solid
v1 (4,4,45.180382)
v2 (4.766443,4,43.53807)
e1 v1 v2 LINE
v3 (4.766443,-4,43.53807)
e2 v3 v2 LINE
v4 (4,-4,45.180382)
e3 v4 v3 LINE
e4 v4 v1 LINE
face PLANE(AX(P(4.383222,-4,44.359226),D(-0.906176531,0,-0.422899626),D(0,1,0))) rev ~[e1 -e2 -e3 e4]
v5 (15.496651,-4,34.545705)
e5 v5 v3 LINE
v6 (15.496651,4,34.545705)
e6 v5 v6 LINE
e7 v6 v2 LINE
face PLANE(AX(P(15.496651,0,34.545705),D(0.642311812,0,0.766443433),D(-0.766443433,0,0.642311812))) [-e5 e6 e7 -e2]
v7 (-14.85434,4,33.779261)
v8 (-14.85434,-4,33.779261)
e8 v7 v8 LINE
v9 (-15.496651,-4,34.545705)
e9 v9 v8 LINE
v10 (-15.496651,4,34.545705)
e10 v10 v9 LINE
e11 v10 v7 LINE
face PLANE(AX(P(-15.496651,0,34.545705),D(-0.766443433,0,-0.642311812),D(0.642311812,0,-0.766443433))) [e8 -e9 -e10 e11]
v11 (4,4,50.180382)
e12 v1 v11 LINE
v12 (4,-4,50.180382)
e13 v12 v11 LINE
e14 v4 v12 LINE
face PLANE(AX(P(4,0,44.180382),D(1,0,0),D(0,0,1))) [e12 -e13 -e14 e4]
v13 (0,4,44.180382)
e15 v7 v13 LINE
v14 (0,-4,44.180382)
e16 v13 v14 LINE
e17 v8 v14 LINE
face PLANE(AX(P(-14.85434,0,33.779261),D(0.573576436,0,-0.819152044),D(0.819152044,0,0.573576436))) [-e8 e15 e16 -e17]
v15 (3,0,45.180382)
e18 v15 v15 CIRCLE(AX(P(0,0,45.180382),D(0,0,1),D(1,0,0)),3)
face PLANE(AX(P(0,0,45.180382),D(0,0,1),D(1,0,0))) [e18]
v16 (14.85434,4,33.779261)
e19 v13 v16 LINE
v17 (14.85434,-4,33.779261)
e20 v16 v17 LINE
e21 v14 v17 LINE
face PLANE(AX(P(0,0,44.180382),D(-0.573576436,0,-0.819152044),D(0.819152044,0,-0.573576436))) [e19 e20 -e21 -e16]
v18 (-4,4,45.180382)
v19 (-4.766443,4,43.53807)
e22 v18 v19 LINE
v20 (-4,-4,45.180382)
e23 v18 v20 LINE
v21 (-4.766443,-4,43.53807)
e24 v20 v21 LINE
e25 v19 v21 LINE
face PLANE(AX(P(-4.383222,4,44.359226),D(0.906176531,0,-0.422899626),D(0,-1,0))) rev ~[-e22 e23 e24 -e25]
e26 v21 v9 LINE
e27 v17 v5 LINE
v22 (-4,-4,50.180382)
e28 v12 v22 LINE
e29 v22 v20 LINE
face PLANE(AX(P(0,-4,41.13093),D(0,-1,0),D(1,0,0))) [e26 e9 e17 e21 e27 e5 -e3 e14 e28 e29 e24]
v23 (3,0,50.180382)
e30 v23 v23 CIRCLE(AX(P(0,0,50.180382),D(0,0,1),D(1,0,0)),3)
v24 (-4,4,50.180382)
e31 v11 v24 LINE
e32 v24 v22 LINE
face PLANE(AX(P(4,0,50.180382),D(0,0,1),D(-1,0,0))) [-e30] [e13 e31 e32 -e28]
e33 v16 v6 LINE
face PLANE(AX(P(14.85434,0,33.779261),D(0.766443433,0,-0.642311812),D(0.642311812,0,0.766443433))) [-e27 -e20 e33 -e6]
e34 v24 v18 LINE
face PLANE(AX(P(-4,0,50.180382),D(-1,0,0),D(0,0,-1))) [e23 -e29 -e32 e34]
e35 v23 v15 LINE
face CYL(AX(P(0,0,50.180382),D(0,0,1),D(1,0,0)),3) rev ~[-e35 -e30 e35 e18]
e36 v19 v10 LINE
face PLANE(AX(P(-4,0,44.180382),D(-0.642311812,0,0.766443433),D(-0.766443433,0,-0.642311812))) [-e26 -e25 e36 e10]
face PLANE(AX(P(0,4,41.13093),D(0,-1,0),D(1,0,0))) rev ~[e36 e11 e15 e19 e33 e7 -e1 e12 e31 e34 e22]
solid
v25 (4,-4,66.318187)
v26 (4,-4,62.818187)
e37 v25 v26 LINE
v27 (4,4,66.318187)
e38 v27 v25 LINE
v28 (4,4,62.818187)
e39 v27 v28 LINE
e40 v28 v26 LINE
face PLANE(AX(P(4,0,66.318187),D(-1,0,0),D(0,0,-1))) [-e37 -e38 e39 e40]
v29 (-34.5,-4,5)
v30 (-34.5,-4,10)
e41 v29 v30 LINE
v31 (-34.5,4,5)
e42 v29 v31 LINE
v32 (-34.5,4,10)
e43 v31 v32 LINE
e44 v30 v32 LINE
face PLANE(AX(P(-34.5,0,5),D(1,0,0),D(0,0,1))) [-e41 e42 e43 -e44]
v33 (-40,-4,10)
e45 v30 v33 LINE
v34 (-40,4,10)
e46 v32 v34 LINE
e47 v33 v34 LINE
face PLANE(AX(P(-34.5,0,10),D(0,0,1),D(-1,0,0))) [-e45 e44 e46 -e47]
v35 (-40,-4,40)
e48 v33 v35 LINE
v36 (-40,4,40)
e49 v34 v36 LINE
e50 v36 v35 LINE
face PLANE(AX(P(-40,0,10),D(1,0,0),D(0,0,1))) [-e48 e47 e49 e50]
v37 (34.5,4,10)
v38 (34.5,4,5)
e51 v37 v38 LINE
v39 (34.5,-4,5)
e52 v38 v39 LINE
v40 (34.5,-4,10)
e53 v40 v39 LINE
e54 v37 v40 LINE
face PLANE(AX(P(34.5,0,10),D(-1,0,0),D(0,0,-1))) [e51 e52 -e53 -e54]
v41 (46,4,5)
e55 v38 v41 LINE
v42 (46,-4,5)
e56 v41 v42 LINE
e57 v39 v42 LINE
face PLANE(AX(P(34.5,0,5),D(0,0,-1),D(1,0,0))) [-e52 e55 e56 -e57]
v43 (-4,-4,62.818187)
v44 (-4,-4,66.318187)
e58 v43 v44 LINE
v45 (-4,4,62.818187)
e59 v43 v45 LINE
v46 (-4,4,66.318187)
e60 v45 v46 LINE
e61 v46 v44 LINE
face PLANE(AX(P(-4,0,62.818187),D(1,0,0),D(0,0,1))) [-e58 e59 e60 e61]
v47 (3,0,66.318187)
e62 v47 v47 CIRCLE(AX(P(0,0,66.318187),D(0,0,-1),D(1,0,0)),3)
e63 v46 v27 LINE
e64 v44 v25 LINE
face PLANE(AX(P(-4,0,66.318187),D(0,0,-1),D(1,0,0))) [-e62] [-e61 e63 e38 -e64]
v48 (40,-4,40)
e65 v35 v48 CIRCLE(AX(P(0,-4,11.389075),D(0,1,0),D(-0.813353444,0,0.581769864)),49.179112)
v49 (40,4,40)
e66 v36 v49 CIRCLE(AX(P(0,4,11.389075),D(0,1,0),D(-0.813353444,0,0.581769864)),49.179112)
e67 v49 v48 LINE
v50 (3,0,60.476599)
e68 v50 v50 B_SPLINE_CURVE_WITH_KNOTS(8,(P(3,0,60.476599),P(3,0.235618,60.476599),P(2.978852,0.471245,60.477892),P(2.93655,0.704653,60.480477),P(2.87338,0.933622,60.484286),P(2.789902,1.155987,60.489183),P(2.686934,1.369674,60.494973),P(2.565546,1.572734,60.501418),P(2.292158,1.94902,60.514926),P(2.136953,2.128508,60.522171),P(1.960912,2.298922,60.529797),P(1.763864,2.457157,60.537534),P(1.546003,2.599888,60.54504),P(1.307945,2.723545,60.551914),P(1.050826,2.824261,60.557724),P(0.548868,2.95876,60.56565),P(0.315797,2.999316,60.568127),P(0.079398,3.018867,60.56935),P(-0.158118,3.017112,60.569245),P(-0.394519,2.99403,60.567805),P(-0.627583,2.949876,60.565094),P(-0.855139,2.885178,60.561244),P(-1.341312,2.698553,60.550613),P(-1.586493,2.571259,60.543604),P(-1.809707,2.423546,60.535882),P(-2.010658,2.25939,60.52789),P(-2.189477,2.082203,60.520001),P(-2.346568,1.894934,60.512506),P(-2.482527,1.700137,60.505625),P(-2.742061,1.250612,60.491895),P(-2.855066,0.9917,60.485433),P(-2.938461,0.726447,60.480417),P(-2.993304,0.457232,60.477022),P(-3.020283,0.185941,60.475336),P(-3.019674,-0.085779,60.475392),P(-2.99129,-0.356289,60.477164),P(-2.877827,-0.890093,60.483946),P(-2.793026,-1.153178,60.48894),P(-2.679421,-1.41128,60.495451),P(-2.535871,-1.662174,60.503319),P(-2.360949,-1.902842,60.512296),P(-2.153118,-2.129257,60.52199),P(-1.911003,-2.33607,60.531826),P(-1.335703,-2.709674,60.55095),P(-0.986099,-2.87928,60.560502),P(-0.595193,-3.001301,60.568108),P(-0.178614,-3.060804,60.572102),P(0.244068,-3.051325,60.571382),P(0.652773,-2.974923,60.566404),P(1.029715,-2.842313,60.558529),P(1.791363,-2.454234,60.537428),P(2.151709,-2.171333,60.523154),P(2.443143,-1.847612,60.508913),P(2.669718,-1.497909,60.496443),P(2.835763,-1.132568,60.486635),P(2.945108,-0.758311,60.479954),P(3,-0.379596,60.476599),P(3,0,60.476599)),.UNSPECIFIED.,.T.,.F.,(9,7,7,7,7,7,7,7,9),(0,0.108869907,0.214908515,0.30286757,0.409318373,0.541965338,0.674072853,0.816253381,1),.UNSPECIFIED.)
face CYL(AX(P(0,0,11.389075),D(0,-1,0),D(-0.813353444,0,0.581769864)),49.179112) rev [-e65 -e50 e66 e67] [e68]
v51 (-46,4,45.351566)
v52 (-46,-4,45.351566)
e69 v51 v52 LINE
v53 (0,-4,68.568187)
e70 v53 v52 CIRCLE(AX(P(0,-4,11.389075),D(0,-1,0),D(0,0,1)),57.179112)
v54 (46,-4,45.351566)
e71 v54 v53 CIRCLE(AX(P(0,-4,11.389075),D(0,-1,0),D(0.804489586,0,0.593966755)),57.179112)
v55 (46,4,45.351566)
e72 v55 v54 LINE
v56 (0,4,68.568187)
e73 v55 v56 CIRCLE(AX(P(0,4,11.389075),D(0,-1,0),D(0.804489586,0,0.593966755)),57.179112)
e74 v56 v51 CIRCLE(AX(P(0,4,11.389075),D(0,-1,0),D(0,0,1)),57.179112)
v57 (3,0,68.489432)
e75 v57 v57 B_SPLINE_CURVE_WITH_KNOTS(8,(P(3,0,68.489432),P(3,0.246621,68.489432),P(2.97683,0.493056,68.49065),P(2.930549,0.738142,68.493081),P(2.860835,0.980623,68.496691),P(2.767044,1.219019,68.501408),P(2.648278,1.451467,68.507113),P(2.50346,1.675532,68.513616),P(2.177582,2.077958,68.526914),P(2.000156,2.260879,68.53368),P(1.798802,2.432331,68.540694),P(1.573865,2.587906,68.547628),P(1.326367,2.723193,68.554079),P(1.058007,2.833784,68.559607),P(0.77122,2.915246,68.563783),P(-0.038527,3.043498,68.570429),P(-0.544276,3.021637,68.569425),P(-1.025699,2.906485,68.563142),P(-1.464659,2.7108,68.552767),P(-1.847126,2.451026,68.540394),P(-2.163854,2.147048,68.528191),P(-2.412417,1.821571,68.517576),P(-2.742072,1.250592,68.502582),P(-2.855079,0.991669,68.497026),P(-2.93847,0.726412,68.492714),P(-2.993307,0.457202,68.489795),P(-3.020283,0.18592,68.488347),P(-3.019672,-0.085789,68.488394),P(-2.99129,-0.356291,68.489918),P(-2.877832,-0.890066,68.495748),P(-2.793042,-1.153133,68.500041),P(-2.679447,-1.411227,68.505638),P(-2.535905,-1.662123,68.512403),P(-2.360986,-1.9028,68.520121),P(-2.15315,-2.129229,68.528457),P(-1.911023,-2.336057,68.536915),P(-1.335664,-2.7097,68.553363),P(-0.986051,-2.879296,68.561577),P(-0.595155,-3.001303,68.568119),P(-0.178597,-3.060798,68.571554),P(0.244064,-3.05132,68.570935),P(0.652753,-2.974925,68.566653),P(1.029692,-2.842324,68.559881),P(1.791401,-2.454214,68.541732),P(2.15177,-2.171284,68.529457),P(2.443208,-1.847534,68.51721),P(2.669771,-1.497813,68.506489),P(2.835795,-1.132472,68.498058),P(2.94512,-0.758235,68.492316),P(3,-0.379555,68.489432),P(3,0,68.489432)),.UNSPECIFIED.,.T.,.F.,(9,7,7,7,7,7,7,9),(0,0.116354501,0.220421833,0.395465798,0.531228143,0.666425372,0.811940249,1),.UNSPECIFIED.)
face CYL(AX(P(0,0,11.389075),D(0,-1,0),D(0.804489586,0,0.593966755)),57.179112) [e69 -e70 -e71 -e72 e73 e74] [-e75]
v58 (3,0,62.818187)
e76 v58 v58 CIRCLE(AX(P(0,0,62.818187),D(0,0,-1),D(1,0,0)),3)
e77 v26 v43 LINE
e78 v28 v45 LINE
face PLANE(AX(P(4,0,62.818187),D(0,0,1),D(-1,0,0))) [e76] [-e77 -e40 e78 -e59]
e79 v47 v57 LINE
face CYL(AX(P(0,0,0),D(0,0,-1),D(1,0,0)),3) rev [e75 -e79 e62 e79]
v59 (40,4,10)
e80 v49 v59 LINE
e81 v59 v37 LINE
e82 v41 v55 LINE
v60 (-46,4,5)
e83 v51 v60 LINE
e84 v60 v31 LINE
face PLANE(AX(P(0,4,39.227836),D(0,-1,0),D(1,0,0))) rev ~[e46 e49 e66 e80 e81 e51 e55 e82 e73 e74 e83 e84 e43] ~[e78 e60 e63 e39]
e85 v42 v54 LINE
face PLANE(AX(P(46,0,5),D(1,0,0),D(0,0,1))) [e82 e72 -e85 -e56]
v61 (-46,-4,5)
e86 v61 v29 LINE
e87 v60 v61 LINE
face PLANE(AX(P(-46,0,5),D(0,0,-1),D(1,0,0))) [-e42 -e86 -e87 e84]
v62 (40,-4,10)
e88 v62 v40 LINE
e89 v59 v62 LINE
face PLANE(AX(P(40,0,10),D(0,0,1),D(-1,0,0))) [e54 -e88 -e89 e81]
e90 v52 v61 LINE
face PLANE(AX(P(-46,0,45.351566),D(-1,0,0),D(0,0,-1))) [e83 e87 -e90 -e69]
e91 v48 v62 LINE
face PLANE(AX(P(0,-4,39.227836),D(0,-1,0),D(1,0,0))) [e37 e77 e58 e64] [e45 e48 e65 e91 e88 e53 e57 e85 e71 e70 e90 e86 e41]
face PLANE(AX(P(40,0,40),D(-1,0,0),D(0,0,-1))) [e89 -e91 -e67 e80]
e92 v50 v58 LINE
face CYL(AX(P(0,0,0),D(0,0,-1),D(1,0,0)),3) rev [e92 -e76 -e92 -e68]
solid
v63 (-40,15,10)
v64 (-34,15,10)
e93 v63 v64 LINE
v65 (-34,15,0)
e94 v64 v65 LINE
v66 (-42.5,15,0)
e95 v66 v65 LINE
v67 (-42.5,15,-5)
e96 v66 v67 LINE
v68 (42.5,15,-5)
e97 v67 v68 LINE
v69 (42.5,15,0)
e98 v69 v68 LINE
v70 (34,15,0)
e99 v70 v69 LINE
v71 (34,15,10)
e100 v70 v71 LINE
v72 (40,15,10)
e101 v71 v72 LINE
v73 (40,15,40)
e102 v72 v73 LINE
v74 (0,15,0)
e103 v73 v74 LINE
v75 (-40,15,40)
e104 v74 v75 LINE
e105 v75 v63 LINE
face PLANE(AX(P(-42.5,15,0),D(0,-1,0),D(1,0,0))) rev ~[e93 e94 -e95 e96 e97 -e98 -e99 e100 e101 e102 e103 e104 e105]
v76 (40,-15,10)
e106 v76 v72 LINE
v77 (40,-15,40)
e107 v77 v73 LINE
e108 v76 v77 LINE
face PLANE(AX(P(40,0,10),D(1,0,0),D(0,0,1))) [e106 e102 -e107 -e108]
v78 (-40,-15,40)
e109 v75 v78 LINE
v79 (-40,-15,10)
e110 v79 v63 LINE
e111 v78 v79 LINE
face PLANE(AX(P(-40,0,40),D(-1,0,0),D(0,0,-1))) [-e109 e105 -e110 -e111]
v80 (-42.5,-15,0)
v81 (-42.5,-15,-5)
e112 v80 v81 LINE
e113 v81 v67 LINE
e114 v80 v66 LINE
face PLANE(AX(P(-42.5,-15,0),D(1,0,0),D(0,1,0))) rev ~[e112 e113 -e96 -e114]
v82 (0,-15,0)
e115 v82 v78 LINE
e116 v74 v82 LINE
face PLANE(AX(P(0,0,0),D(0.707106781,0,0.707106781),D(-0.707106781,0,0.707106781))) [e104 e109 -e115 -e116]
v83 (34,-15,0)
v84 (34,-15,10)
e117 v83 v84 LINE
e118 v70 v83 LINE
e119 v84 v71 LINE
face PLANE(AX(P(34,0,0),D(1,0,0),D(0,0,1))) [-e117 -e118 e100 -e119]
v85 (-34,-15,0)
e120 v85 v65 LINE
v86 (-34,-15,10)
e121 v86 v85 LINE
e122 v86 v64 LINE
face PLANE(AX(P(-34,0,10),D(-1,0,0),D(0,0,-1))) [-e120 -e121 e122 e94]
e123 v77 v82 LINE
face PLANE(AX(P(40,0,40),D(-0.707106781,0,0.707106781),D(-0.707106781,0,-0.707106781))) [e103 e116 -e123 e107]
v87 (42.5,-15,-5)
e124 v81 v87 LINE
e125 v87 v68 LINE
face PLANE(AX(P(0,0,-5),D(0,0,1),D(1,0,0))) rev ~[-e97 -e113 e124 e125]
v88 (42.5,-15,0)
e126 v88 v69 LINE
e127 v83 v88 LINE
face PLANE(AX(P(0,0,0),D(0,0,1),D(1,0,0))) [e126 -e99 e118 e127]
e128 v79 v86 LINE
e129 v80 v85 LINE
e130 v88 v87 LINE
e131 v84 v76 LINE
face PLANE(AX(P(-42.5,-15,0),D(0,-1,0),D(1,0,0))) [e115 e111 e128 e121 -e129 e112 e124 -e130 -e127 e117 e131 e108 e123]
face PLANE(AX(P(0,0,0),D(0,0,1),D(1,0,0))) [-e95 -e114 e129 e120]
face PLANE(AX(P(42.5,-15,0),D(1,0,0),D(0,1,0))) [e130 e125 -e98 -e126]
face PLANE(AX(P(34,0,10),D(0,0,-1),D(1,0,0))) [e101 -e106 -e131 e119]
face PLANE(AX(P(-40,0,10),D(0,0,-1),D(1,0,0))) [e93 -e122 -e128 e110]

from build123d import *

# Parameters (mm, degrees)
F0_W      = 85
F0_H      = 30
F1_DEPTH  = 5
F3_DEPTH  = 15
F5_DEPTH  = 4
F6_R      = 3
F7_DEPTH  = 80
F9_DEPTH  = 4
F10_R     = 3
F11_DEPTH = 5
F12_SIZE  = 1


with BuildPart() as f1:
    # F0 (on Top) → F1 (new body)
    with BuildSketch(Plane.XY):
        Rectangle(F0_W, F0_H)
    extrude(amount=-F1_DEPTH)

    # F2 (on Front) → F3 (join, symmetric)
    with BuildSketch(Plane.XZ):
        Polygon((-34, 0), (0, 0), (-40, 40), (-40, 10), (-34, 10), align=None)
        Polygon((40, 40), (0, 0), (34, 0), (34, 10), (40, 10), align=None)
    extrude(amount=F3_DEPTH, both=True)


with BuildPart() as f5:
    # F4 (on Front) → F5 (new body, symmetric)
    with BuildSketch(Plane.XZ):
        with BuildLine():
            Line((-40, 10), (-40, 40))
            ThreePointArc((-40, 40), (-22.4891657332, 55.1249006818), (0, 60.5681866361))
            ThreePointArc((0, 60.5681866361), (22.4891657332, 55.1249006818), (40, 40))
            Line((40, 40), (40, 10))
            Line((40, 10), (34.5, 10))
            Line((34.5, 10), (34.5, 5))
            Line((34.5, 5), (46, 5))
            Line((46, 5), (46, 45.3515663186))
            ThreePointArc((46, 45.3515663186), (25.7634016531, 62.4351125068), (0, 68.5681866361))
            ThreePointArc((0, 68.5681866361), (-25.7634016531, 62.4351125068), (-46, 45.3515663186))
            Line((-46, 45.3515663186), (-46, 5))
            Line((-46, 5), (-34.5, 5))
            Line((-34.5, 5), (-34.5, 10))
            Line((-34.5, 10), (-40, 10))
        make_face()
        Polygon((-4, 66.3181866361), (0, 66.3181866361), (4, 66.3181866361), (4, 62.8181866361), (0, 62.8181866361), (-4, 62.8181866361), align=None, mode=Mode.SUBTRACT)
    extrude(amount=F5_DEPTH, both=True)

    # F6 (on Top) → F7 (cut)
    with BuildSketch(Plane.XY):
        Circle(F6_R)
    extrude(amount=F7_DEPTH, mode=Mode.SUBTRACT)


with BuildPart() as f9:
    # F8 (on Front) → F9 (new body, symmetric)
    with BuildSketch(Plane.XZ):
        Polygon((4, 50.1803820431), (0, 50.1803820431), (-4, 50.1803820431), (-4, 44.1803820431), (-15.4966514918, 34.5457048573), (-14.8543396794, 33.7792614245), (0, 44.1803820431), (14.8543396794, 33.7792614245), (15.4966514918, 34.5457048573), (4, 44.1803820431), align=None)
    extrude(amount=F9_DEPTH, both=True)

    # F10 (on face) → F11 (cut)
    with BuildSketch(Plane.XY.offset(50.1803820431)):
        Circle(F10_R)
    extrude(amount=-F11_DEPTH, mode=Mode.SUBTRACT)

    # F12
    f12_edges = [f9.edges().sort_by_distance(p)[0] for p in [
        (-4, 0, 44.180382),
        (4, 0, 44.180382),
    ]]
    chamfer(f12_edges, length=F12_SIZE)


solid = Compound([f1.part, f5.part, f9.part])
